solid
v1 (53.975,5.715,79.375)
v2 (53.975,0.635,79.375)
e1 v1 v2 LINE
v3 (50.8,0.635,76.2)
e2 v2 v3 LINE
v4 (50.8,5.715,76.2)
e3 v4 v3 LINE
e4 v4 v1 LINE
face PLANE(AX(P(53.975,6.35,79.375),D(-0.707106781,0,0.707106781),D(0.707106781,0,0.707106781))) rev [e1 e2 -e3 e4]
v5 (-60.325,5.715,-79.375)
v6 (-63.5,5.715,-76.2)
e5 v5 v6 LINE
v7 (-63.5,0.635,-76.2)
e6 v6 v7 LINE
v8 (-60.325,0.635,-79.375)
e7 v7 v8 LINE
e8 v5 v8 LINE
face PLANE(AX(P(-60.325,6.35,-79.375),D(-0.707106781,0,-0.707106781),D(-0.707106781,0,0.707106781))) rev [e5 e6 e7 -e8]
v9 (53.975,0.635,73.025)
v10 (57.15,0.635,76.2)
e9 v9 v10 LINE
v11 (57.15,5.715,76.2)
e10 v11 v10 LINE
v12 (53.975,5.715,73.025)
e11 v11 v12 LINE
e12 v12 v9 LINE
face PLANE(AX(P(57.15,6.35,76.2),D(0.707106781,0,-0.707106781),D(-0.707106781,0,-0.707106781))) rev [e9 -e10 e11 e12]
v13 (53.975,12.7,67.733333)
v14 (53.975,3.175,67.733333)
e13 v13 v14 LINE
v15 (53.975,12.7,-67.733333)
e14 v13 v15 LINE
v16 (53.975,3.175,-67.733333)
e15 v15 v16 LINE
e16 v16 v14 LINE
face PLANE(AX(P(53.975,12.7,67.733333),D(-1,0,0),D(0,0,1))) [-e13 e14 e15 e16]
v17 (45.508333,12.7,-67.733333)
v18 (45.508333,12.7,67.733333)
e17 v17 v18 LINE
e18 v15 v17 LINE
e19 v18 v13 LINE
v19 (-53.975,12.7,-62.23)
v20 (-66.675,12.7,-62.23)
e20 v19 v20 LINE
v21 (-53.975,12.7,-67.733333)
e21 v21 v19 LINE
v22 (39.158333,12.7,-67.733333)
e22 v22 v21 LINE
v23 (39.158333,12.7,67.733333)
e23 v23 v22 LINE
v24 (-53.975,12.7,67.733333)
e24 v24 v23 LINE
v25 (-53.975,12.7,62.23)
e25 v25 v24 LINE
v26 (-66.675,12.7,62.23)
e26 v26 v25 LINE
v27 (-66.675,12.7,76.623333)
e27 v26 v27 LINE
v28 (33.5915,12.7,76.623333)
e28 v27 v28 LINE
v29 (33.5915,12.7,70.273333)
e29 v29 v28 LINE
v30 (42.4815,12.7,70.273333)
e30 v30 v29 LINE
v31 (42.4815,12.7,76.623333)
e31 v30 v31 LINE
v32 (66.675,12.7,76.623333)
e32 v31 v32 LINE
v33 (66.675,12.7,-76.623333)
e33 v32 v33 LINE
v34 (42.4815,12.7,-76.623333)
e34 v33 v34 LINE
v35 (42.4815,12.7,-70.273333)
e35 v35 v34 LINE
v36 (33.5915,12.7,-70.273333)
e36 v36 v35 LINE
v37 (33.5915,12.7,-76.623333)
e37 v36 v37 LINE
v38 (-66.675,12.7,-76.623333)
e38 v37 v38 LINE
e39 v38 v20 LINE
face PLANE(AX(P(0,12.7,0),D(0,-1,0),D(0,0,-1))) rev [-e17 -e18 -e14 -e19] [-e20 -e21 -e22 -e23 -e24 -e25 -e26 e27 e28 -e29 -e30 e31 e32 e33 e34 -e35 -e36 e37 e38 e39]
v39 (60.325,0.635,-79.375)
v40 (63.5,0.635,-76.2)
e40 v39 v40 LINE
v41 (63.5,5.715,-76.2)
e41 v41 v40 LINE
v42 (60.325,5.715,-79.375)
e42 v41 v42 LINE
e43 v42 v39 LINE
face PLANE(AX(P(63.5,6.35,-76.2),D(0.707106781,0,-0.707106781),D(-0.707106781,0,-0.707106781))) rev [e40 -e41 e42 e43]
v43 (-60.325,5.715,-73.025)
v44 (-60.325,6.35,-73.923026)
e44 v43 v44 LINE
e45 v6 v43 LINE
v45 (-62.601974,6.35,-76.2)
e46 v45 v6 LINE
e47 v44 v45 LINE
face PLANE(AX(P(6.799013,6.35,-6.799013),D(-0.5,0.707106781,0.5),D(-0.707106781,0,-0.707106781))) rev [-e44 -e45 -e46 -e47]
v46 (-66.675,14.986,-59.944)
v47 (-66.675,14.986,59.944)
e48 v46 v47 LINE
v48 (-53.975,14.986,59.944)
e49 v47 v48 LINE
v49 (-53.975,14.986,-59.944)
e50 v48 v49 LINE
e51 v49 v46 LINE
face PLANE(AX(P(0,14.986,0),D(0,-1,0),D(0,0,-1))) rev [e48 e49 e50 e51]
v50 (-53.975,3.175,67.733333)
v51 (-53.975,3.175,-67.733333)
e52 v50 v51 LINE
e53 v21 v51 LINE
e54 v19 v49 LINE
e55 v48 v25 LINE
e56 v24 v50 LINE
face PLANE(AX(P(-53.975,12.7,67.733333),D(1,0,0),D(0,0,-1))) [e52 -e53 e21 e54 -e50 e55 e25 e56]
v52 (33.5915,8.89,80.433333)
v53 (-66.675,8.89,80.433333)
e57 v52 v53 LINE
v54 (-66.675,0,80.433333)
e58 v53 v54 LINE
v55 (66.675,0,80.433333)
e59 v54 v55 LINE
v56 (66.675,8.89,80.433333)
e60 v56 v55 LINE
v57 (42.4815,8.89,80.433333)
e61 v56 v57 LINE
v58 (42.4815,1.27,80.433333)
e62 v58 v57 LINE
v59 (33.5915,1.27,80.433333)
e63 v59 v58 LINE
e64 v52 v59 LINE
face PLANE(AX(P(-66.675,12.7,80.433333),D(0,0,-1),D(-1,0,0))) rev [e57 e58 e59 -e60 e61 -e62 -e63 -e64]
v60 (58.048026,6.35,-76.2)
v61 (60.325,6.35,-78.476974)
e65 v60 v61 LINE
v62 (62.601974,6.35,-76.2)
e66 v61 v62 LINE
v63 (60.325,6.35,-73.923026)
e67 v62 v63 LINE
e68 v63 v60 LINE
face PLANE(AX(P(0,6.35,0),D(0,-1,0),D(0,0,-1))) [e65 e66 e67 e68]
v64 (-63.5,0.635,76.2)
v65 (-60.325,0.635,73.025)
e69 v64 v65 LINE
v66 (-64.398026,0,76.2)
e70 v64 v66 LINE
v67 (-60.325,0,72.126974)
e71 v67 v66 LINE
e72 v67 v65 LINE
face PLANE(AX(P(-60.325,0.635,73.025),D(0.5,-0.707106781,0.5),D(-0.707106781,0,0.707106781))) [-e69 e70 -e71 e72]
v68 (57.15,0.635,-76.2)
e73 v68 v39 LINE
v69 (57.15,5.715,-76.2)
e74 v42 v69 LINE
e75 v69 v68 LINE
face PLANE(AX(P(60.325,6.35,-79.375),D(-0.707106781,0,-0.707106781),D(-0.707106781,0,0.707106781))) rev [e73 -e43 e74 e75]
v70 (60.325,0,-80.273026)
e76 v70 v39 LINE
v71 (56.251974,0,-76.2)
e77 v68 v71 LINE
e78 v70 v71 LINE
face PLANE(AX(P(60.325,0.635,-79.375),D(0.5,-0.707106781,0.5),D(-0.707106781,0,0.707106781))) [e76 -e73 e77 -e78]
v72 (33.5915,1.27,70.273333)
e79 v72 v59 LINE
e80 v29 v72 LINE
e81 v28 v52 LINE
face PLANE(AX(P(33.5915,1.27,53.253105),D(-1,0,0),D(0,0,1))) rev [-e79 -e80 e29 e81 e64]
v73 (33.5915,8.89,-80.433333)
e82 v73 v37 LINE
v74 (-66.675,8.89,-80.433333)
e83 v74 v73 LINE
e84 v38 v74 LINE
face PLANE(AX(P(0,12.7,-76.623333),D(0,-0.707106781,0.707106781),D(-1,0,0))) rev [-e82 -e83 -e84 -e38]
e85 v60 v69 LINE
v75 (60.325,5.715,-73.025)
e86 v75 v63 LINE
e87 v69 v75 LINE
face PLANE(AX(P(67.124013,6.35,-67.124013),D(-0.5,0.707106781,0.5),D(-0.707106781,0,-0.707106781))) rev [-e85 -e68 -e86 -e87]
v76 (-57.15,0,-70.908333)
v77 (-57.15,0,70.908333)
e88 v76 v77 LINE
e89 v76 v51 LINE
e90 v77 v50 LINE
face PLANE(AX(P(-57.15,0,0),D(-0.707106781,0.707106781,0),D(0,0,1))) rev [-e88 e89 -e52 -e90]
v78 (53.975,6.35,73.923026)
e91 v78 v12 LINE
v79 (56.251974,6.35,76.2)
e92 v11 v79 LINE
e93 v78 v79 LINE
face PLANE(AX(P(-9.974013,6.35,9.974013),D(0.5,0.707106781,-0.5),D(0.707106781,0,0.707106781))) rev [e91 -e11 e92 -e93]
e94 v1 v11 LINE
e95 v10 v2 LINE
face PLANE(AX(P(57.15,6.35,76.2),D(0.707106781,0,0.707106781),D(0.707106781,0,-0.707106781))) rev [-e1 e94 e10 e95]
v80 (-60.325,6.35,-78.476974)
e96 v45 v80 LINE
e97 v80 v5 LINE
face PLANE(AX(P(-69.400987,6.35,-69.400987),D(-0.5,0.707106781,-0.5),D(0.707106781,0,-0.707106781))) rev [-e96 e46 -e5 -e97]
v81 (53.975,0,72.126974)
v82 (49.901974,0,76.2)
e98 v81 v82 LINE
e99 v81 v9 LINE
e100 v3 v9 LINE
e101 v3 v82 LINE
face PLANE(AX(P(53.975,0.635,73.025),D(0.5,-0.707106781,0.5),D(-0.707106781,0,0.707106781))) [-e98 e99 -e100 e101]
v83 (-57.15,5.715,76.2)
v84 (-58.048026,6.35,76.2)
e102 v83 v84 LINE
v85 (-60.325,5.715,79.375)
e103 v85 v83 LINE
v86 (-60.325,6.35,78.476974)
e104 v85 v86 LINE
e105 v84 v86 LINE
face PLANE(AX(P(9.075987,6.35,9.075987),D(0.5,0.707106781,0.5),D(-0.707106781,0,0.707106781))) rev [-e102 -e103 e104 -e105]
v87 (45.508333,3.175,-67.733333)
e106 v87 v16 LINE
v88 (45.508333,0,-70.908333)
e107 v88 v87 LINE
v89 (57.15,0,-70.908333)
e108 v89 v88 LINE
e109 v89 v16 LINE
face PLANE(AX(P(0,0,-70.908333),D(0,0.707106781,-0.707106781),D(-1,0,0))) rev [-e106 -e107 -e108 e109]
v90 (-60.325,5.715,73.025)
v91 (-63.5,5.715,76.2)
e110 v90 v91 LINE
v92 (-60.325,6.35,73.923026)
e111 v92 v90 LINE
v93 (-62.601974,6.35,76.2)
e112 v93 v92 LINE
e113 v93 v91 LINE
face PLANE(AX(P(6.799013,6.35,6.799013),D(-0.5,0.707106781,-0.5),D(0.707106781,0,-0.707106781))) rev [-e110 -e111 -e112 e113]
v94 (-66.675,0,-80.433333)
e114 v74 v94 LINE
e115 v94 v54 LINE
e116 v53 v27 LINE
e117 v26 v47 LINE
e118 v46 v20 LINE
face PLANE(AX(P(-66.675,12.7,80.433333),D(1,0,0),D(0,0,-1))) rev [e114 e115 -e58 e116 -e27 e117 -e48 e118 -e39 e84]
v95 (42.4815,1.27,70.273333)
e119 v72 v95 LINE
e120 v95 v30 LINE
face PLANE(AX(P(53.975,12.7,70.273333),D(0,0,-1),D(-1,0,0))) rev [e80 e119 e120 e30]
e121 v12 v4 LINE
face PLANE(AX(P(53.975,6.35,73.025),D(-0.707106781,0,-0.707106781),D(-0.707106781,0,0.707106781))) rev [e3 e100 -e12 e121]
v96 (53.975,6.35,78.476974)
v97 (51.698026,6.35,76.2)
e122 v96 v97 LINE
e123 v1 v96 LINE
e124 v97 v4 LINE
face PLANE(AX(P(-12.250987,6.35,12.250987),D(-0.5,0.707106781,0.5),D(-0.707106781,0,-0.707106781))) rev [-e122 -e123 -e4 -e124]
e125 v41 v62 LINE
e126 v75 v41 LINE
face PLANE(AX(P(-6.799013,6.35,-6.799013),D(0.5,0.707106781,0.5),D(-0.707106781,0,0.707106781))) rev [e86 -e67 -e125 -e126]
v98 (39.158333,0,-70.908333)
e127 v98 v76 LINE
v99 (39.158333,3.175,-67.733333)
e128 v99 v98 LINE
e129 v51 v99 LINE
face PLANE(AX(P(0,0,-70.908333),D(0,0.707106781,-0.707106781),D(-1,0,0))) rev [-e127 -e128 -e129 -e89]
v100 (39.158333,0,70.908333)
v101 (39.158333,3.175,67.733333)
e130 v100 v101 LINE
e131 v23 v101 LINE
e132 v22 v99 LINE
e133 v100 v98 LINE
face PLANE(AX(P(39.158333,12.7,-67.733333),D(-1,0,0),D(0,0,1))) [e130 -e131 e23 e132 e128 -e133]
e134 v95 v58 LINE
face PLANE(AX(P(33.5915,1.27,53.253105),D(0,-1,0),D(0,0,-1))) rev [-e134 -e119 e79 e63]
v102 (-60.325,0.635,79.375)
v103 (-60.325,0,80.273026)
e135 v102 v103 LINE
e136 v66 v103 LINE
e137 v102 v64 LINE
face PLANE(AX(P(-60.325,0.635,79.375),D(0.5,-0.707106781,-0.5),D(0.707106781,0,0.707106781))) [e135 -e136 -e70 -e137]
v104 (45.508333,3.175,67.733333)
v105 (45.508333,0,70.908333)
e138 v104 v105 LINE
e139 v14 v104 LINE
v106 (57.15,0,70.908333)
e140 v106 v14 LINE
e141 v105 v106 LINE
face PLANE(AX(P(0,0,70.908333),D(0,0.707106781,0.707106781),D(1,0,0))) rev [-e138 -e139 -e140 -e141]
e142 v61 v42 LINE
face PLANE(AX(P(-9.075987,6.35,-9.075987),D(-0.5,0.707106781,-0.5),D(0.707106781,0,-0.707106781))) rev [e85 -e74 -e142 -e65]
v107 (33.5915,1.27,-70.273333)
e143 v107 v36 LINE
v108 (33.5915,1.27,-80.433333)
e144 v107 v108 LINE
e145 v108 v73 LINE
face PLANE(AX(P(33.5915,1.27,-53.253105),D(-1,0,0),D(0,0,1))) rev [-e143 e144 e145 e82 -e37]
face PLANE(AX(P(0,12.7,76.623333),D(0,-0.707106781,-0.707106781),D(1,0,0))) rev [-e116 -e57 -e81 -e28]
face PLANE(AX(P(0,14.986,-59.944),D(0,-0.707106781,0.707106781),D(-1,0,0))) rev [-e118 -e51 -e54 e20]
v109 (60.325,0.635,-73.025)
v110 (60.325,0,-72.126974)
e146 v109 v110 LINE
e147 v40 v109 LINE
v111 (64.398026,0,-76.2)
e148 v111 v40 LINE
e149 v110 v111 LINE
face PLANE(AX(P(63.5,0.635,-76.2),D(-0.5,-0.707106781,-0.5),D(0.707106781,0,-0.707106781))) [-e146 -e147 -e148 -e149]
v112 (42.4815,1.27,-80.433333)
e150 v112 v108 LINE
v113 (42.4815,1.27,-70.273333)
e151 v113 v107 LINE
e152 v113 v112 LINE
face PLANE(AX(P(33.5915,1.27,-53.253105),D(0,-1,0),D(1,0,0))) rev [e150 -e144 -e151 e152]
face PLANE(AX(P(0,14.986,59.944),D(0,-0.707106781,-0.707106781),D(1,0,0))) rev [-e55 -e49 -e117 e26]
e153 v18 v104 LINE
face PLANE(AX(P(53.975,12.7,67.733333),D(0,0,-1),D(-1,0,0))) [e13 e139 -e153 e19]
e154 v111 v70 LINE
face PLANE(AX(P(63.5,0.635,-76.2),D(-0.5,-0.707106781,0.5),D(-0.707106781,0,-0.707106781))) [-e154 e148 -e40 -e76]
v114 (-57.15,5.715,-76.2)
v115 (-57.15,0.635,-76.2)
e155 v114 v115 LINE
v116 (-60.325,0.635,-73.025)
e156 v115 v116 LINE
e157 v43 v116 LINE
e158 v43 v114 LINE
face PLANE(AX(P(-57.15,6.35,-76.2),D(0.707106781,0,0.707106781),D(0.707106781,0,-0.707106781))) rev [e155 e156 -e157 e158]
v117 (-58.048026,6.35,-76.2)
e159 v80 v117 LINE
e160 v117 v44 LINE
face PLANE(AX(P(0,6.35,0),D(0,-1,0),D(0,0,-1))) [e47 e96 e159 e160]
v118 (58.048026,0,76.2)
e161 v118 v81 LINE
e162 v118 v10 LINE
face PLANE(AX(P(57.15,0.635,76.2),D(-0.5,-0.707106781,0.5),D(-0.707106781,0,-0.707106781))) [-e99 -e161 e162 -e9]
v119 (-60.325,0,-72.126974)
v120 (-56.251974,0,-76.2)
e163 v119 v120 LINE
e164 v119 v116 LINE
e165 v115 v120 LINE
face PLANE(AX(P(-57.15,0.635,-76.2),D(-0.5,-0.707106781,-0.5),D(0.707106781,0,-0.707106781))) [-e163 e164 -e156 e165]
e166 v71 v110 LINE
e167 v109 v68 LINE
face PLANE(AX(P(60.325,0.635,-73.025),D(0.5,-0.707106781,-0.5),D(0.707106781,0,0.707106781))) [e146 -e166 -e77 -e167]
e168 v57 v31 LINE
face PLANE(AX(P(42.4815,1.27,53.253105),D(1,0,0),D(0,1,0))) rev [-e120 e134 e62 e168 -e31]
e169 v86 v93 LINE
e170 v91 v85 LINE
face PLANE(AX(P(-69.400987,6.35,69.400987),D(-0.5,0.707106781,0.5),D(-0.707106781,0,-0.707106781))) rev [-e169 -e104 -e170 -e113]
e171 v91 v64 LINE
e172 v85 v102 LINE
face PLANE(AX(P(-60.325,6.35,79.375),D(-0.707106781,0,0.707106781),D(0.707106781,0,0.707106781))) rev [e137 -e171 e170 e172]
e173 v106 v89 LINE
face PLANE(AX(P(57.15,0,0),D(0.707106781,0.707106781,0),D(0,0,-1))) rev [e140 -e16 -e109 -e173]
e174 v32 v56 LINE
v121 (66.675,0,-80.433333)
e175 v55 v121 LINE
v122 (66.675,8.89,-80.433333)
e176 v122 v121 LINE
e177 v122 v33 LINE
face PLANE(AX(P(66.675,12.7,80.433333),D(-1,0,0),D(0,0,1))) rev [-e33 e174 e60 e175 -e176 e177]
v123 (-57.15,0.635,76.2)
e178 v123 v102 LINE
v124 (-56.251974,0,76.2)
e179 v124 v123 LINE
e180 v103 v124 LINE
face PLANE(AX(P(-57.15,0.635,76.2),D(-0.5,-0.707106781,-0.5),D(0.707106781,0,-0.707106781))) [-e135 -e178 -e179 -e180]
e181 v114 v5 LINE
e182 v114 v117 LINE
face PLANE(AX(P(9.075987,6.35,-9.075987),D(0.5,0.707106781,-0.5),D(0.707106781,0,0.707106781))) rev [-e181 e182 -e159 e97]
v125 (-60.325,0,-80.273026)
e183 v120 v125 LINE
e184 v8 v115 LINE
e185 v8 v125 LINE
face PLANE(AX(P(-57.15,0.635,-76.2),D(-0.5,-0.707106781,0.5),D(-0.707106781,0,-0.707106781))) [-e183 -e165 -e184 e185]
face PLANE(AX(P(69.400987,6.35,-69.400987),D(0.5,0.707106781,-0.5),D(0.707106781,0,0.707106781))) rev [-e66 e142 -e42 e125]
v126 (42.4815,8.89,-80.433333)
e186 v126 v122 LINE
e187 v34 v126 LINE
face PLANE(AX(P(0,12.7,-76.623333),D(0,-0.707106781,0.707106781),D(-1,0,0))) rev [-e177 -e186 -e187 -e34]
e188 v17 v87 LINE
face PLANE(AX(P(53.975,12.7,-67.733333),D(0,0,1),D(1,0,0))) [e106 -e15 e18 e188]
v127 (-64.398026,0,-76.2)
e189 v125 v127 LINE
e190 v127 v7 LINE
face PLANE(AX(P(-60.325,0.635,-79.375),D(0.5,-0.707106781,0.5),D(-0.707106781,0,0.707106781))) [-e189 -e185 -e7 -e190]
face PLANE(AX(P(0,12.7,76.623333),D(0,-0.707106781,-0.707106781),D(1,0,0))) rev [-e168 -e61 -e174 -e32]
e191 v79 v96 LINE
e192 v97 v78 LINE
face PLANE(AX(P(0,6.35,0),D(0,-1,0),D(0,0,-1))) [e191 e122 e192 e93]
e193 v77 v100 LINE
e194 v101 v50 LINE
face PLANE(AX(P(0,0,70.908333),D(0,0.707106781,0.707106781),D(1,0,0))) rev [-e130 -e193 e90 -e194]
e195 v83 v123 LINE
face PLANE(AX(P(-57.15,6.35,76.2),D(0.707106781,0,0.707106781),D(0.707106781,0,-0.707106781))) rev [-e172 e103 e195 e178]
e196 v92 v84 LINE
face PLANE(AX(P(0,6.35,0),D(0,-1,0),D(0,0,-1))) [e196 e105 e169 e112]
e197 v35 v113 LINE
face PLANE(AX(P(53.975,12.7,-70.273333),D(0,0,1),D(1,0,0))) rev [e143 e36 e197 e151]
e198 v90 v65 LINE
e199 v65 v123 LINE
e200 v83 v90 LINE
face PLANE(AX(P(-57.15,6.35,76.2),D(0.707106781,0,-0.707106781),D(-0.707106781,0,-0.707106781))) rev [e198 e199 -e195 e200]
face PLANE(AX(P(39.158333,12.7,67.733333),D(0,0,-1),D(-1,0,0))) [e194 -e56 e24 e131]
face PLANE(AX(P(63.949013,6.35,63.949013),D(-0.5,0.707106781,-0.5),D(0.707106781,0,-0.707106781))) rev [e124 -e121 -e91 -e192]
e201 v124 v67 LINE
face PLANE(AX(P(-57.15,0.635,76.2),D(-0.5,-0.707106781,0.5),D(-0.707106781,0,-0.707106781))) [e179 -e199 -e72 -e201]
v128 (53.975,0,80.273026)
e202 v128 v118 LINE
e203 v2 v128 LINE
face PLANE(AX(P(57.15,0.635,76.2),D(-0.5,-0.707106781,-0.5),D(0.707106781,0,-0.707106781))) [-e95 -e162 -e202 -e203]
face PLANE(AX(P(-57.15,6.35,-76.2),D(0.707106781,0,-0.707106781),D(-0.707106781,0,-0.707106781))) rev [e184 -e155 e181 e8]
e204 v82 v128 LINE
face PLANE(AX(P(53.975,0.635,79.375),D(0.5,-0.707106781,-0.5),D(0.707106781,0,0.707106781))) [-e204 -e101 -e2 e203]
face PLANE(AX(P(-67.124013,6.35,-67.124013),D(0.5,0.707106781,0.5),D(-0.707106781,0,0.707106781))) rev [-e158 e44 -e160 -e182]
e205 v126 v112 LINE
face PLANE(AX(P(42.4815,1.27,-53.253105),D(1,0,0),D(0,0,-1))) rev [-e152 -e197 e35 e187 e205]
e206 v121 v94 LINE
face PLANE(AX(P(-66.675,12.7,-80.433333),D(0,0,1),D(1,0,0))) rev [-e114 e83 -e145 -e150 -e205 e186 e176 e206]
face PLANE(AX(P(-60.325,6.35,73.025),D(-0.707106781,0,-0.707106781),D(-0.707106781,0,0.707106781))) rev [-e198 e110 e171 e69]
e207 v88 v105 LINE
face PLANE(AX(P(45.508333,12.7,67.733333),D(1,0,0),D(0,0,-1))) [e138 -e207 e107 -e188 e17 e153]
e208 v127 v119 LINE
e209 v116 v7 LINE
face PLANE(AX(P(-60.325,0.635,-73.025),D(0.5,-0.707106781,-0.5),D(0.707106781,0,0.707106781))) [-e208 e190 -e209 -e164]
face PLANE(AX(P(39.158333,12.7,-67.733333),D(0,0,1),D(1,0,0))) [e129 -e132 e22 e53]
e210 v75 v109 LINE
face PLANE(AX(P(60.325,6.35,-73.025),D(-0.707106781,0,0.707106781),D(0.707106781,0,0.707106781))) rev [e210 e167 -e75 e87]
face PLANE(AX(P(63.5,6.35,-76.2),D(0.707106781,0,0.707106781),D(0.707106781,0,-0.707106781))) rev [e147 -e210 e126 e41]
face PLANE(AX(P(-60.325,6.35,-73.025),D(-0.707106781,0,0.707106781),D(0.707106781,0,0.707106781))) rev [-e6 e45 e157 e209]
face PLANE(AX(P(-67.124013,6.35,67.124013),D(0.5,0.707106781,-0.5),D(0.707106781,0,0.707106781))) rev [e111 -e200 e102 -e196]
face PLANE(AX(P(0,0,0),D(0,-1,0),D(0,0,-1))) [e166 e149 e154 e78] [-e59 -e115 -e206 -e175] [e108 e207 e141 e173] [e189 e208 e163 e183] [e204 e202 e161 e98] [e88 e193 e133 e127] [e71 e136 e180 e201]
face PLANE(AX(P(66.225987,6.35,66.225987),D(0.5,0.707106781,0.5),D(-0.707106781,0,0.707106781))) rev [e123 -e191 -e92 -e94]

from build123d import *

# Parameters (mm, degrees)
SKETCH2_W           = 133.35
SKETCH2_H           = 160.866666666
SKETCH2_W_2         = 93.133333333
SKETCH2_H_2         = 135.466666666
SKETCH2_W_3         = 8.466666667
BOSS_EXTRUDE1_DEPTH = 12.7
CUT_EXTRUDE1_DEPTH  = 6.35
CHAMFER4_SIZE       = 3.81
CHAMFER1_SIZE       = 0.635
CHAMFER2_SIZE       = 3.175
SKETCH4_W           = 8.89
SKETCH4_H           = 11.43
CUT_EXTRUDE2_DEPTH  = 10.16
SKETCH5_W           = 8.89
SKETCH5_H           = 11.43
CUT_EXTRUDE3_DEPTH  = 10.16
SKETCH6_W           = 12.7
SKETCH6_H           = 124.46
BOSS_EXTRUDE2_DEPTH = 2.286
CHAMFER5_SIZE       = 2.286


with BuildPart() as part:
    # Sketch2 → Boss-Extrude1 (new body)
    with BuildSketch(Plane(origin=(0, 0, 0), x_dir=(1, 0, 0), z_dir=(0, 1, 0))):
        Rectangle(SKETCH2_W, SKETCH2_H)
        with Locations((-7.408333333, 0)):
            Rectangle(SKETCH2_W_2, SKETCH2_H_2, mode=Mode.SUBTRACT)
        with Locations((49.741666667, 0)):
            Rectangle(SKETCH2_W_3, SKETCH2_H_2, mode=Mode.SUBTRACT)
    extrude(amount=BOSS_EXTRUDE1_DEPTH)

    # Sketch3 → Cut-Extrude1 (cut)
    with BuildSketch(Plane.XZ):
        Polygon((-57.15, 76.2), (-60.325, 73.025), (-63.5, 76.2), (-60.325, 79.375), align=None)
        Polygon((57.15, 76.2), (53.975, 73.025), (50.8, 76.2), (53.975, 79.375), align=None)
        Polygon((63.5, -76.2), (60.325, -79.375), (57.15, -76.2), (60.325, -73.025), align=None)
        Polygon((-57.15, -76.2), (-60.325, -79.375), (-63.5, -76.2), (-60.325, -73.025), align=None)
    extrude(amount=-CUT_EXTRUDE1_DEPTH, mode=Mode.SUBTRACT)

    # Chamfer4
    chamfer4_edges = [part.edges().sort_by_distance(p)[0] for p in [
        (0, 12.7, -80.433333333),
        (0, 12.7, 80.433333333),
    ]]
    chamfer(chamfer4_edges, length=CHAMFER4_SIZE)

    # Chamfer1
    chamfer1_edges = [part.edges().sort_by_distance(p)[0] for p in [
        (-58.7375, 6.35, -74.6125),
        (-58.7375, 6.35, -77.7875),
        (-61.9125, 6.35, -77.7875),
        (-61.9125, 6.35, -74.6125),
        (-58.7375, 0, -74.6125),
        (-61.9125, 0, -74.6125),
        (-61.9125, 0, -77.7875),
        (-58.7375, 0, -77.7875),
        (61.9125, 6.35, -74.6125),
        (61.9125, 6.35, -77.7875),
        (58.7375, 6.35, -77.7875),
        (58.7375, 6.35, -74.6125),
        (61.9125, 0, -74.6125),
        (58.7375, 0, -74.6125),
        (58.7375, 0, -77.7875),
        (61.9125, 0, -77.7875),
        (55.5625, 6.35, 77.7875),
        (55.5625, 6.35, 74.6125),
        (52.3875, 6.35, 74.6125),
        (52.3875, 6.35, 77.7875),
        (55.5625, 0, 77.7875),
        (52.3875, 0, 77.7875),
        (52.3875, 0, 74.6125),
        (55.5625, 0, 74.6125),
        (-58.7375, 6.35, 77.7875),
        (-58.7375, 6.35, 74.6125),
        (-61.9125, 6.35, 74.6125),
        (-61.9125, 6.35, 77.7875),
        (-58.7375, 0, 77.7875),
        (-61.9125, 0, 77.7875),
        (-61.9125, 0, 74.6125),
        (-58.7375, 0, 74.6125),
    ]]
    chamfer(chamfer1_edges, length=CHAMFER1_SIZE)

    # Chamfer2
    chamfer2_edges = [part.edges().sort_by_distance(p)[0] for p in [
        (53.975, 0, 0),
        (49.741666667, 0, -67.733333333),
        (49.741666667, 0, 67.733333333),
        (-7.408333333, 0, -67.733333333),
        (-53.975, 0, 0),
        (-7.408333333, 0, 67.733333333),
    ]]
    chamfer(chamfer2_edges, length=CHAMFER2_SIZE)

    # Sketch4 → Cut-Extrude2 (cut)
    with BuildSketch(Plane.XY.offset(80.433333333)):
        with Locations((38.0365, 6.985)):
            Rectangle(SKETCH4_W, SKETCH4_H)
    extrude(amount=-CUT_EXTRUDE2_DEPTH, mode=Mode.SUBTRACT)

    # Sketch5 → Cut-Extrude3 (cut)
    with BuildSketch(Plane(origin=(0, 0, -80.433333333), x_dir=(-1, 0, 0), z_dir=(0, 0, -1))):
        with Locations((-38.0365, 6.985)):
            Rectangle(SKETCH5_W, SKETCH5_H)
    extrude(amount=-CUT_EXTRUDE3_DEPTH, mode=Mode.SUBTRACT)

    # Sketch6 → Boss-Extrude2 (add)
    with BuildSketch(Plane(origin=(0, 12.7, 0), x_dir=(1, 0, 0), z_dir=(0, 1, 0))):
        with Locations((-60.325, 0)):
            Rectangle(SKETCH6_W, SKETCH6_H)
    extrude(amount=BOSS_EXTRUDE2_DEPTH)

    # Chamfer5
    chamfer5_edges = [part.edges().sort_by_distance(p)[0] for p in [
        (-60.325, 14.986, -62.23),
        (-60.325, 14.986, 62.23),
    ]]
    chamfer(chamfer5_edges, length=CHAMFER5_SIZE - 0.0001)  # a hair under: the kernel refuses the full size


solid = part.part
